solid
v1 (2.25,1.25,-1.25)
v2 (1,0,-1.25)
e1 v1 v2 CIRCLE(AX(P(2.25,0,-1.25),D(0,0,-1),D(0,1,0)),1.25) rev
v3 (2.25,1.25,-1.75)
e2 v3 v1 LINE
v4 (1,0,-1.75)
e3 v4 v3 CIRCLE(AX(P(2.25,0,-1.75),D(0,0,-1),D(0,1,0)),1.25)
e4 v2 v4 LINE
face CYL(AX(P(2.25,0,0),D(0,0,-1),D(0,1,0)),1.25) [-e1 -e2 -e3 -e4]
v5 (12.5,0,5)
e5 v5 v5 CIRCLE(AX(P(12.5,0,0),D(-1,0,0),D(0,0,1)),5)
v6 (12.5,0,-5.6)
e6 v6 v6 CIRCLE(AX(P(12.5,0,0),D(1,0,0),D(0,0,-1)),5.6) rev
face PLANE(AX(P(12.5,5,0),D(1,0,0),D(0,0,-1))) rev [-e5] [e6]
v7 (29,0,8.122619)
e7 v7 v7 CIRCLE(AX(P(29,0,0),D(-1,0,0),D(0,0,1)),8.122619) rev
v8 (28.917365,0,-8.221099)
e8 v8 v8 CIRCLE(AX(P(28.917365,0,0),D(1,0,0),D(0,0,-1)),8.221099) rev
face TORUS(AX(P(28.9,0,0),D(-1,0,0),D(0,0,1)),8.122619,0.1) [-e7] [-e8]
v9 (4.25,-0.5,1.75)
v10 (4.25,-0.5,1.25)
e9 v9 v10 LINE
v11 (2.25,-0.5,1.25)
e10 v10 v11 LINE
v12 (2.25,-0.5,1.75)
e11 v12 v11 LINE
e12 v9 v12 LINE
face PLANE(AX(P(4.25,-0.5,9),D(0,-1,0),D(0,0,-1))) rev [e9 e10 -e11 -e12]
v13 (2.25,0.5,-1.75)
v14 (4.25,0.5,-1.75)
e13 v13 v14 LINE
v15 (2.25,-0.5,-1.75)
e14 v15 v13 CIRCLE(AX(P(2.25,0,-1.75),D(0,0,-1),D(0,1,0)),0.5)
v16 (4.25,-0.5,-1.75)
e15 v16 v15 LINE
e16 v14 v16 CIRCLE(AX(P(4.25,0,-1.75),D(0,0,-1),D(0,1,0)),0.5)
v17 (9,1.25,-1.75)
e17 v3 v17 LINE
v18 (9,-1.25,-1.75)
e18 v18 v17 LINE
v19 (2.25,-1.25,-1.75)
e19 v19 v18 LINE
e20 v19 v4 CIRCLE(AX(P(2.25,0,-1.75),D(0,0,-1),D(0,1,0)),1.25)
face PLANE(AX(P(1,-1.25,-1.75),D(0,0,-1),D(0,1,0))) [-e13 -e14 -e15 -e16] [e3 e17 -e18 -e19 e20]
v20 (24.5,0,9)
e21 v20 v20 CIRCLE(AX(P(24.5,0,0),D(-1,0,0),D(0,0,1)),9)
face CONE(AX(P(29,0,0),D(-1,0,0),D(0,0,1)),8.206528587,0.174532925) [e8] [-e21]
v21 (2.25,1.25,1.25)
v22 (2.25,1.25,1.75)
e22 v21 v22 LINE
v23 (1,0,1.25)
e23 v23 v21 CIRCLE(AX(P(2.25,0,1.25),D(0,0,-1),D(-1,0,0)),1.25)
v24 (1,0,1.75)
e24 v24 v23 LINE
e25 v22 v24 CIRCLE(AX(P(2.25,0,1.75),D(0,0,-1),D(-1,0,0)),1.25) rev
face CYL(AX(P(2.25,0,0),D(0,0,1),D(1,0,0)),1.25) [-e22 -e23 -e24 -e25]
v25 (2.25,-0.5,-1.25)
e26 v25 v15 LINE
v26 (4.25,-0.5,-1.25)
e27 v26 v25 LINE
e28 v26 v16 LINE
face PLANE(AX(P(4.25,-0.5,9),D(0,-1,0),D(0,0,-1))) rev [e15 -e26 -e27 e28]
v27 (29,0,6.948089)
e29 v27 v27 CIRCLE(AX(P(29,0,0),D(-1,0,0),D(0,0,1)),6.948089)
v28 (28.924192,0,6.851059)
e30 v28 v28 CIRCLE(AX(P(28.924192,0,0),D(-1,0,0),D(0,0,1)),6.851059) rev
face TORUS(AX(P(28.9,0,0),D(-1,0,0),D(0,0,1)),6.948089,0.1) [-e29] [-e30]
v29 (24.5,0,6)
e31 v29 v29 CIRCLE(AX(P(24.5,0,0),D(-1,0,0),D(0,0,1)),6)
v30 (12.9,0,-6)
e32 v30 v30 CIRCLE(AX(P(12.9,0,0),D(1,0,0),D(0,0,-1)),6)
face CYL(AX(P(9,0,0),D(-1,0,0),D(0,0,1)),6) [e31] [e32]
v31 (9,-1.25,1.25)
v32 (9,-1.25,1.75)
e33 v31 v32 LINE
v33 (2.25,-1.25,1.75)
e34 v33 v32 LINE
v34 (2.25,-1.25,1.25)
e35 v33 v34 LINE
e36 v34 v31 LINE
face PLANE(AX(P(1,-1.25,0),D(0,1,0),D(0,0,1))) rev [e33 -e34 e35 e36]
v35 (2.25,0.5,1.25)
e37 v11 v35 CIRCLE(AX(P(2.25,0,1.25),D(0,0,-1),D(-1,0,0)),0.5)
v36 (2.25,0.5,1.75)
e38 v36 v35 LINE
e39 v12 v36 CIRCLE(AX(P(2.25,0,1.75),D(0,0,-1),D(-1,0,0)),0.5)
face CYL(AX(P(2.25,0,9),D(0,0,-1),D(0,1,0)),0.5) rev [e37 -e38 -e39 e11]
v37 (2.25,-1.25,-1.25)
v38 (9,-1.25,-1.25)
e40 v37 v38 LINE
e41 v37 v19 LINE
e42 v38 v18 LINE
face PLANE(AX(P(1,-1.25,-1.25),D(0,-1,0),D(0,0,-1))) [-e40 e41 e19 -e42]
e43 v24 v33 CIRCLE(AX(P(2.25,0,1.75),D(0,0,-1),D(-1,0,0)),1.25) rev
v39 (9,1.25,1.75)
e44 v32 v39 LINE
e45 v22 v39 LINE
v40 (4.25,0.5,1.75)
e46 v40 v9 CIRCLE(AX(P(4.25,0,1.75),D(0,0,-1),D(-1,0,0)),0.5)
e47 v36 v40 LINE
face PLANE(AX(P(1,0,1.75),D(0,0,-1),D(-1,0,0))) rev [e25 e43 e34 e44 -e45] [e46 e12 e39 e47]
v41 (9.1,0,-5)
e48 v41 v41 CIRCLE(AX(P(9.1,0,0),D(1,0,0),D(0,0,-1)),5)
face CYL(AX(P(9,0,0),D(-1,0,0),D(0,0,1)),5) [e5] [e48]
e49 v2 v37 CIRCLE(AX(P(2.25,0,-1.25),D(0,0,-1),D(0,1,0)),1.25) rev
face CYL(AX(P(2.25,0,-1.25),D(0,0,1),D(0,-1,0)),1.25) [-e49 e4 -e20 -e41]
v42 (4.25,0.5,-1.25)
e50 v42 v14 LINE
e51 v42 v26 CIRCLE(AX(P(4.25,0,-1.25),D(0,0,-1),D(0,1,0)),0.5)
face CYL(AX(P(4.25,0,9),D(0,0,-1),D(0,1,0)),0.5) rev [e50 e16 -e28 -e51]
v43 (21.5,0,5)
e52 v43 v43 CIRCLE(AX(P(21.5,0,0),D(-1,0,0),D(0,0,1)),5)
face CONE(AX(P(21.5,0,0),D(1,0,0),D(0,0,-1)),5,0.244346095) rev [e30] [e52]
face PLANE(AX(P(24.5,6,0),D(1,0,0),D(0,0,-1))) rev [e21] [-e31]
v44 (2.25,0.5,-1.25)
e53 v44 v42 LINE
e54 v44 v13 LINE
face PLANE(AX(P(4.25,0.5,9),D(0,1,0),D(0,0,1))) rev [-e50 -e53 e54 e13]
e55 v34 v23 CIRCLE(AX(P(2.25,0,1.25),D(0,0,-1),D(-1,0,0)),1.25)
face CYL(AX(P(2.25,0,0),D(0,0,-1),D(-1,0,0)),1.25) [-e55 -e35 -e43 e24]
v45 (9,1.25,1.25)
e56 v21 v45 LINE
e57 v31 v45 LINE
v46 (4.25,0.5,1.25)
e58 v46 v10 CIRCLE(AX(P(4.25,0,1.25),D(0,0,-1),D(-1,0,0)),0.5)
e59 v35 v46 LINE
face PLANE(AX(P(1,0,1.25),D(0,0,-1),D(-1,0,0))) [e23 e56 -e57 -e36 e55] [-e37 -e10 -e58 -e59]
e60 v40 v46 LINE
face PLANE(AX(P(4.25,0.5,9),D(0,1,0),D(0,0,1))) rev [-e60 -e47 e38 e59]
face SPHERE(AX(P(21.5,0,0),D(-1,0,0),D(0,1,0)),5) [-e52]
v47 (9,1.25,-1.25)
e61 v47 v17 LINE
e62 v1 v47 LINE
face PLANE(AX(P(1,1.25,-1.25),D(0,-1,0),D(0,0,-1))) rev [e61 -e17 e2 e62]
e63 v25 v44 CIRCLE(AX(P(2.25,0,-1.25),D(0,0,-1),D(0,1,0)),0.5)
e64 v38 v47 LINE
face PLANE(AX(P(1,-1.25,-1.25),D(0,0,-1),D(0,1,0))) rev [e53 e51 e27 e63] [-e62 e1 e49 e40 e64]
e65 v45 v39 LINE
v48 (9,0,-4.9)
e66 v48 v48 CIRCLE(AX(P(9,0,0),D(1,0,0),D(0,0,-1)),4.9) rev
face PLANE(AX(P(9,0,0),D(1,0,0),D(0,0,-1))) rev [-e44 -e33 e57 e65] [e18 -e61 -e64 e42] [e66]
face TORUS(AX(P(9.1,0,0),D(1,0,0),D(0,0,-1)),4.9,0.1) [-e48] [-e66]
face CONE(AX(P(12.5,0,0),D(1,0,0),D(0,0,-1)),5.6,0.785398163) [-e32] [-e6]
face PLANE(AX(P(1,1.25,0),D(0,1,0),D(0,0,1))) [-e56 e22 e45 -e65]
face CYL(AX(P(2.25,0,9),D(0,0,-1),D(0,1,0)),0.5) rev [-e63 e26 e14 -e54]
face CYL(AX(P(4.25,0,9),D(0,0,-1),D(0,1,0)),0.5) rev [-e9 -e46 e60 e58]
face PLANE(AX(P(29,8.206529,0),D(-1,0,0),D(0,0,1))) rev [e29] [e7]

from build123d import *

# Parameters (mm, degrees)
CHAMFER_1_SIZE      = 0.4
FILLET_1_R          = 0.1
SKETCH_4_W          = 0.5
SKETCH_4_H          = 2.5
EXTRUDE_1_DEPTH     = 8
FILLET_2_R          = 1.25
CUT_EXTRUDE_1_DEPTH = 33.21121699


with BuildPart() as part:
    # Эскиз1 → Повернуть1 (revolve)
    with BuildSketch(Plane.XY, mode=Mode.PRIVATE) as revolve_1_sk:
        with BuildLine():
            Line((9, 0), (9, 5))
            Line((9, 5), (12.5, 5))
            Line((12.5, 5), (12.5, 6))
            Line((12.5, 6), (24.5, 6))
            Line((24.5, 6), (24.5, 9))
            Line((24.5, 9), (29, 8.206528587))
            Line((29, 8.206528587), (29, 6.869960021))
            Line((29, 6.869960021), (21.5, 5))
            ThreePointArc((21.5, 5), (25.035533906, 3.535533906), (26.5, 0))
            Line((26.5, 0), (9, 0))
        make_face()
    revolve(revolve_1_sk.sketch.rotate(Axis((9, 0, 0), (1, 0, 0)), 90), axis=Axis((9, 0, 0), (1, 0, 0)))

    # Фаска1
    chamfer_1_edges = [part.edges().sort_by_distance(p)[0] for p in [
        (12.5, 0, -6),
    ]]
    chamfer(chamfer_1_edges, length=CHAMFER_1_SIZE)

    # Скругление1
    fillet_1_edges = [part.edges().sort_by_distance(p)[0] for p in [
        (9, 0, -5),
        (29, 0, -6.869960021),
        (29, 0, -8.206528587),
    ]]
    fillet(fillet_1_edges, radius=FILLET_1_R)

    # Эскиз4 → Бобышка-Вытянуть1 (add)
    with BuildSketch(Plane.ZY.offset(-9)):
        with Locations((1.5, 0)):
            Rectangle(SKETCH_4_W, SKETCH_4_H)
        with Locations((-1.5, 0)):
            Rectangle(SKETCH_4_W, SKETCH_4_H)
    extrude(amount=EXTRUDE_1_DEPTH)

    # Скругление2
    fillet_2_edges = [part.edges().sort_by_distance(p)[0] for p in [
        (1, -1.25, 1.5),
        (1, -1.25, -1.5),
        (1, 1.25, 1.5),
        (1, 1.25, -1.5),
    ]]
    fillet(fillet_2_edges, radius=FILLET_2_R - 0.0001)  # a hair under: the kernel refuses the full size

    # Эскиз5 → Вырез-Вытянуть1 (cut, through all)
    with BuildSketch(Plane(origin=(0, 0, -1.75), x_dir=(-1, 0, 0), z_dir=(0, 0, -1))):
        with BuildLine():
            Line((-4.25, 0.5), (-2.25, 0.5))
            ThreePointArc((-2.25, 0.5), (-1.75, 0), (-2.25, -0.5))
            Line((-2.25, -0.5), (-4.25, -0.5))
            ThreePointArc((-4.25, -0.5), (-4.75, 0), (-4.25, 0.5))
        make_face()
    extrude(amount=-CUT_EXTRUDE_1_DEPTH, mode=Mode.SUBTRACT)


solid = part.part
